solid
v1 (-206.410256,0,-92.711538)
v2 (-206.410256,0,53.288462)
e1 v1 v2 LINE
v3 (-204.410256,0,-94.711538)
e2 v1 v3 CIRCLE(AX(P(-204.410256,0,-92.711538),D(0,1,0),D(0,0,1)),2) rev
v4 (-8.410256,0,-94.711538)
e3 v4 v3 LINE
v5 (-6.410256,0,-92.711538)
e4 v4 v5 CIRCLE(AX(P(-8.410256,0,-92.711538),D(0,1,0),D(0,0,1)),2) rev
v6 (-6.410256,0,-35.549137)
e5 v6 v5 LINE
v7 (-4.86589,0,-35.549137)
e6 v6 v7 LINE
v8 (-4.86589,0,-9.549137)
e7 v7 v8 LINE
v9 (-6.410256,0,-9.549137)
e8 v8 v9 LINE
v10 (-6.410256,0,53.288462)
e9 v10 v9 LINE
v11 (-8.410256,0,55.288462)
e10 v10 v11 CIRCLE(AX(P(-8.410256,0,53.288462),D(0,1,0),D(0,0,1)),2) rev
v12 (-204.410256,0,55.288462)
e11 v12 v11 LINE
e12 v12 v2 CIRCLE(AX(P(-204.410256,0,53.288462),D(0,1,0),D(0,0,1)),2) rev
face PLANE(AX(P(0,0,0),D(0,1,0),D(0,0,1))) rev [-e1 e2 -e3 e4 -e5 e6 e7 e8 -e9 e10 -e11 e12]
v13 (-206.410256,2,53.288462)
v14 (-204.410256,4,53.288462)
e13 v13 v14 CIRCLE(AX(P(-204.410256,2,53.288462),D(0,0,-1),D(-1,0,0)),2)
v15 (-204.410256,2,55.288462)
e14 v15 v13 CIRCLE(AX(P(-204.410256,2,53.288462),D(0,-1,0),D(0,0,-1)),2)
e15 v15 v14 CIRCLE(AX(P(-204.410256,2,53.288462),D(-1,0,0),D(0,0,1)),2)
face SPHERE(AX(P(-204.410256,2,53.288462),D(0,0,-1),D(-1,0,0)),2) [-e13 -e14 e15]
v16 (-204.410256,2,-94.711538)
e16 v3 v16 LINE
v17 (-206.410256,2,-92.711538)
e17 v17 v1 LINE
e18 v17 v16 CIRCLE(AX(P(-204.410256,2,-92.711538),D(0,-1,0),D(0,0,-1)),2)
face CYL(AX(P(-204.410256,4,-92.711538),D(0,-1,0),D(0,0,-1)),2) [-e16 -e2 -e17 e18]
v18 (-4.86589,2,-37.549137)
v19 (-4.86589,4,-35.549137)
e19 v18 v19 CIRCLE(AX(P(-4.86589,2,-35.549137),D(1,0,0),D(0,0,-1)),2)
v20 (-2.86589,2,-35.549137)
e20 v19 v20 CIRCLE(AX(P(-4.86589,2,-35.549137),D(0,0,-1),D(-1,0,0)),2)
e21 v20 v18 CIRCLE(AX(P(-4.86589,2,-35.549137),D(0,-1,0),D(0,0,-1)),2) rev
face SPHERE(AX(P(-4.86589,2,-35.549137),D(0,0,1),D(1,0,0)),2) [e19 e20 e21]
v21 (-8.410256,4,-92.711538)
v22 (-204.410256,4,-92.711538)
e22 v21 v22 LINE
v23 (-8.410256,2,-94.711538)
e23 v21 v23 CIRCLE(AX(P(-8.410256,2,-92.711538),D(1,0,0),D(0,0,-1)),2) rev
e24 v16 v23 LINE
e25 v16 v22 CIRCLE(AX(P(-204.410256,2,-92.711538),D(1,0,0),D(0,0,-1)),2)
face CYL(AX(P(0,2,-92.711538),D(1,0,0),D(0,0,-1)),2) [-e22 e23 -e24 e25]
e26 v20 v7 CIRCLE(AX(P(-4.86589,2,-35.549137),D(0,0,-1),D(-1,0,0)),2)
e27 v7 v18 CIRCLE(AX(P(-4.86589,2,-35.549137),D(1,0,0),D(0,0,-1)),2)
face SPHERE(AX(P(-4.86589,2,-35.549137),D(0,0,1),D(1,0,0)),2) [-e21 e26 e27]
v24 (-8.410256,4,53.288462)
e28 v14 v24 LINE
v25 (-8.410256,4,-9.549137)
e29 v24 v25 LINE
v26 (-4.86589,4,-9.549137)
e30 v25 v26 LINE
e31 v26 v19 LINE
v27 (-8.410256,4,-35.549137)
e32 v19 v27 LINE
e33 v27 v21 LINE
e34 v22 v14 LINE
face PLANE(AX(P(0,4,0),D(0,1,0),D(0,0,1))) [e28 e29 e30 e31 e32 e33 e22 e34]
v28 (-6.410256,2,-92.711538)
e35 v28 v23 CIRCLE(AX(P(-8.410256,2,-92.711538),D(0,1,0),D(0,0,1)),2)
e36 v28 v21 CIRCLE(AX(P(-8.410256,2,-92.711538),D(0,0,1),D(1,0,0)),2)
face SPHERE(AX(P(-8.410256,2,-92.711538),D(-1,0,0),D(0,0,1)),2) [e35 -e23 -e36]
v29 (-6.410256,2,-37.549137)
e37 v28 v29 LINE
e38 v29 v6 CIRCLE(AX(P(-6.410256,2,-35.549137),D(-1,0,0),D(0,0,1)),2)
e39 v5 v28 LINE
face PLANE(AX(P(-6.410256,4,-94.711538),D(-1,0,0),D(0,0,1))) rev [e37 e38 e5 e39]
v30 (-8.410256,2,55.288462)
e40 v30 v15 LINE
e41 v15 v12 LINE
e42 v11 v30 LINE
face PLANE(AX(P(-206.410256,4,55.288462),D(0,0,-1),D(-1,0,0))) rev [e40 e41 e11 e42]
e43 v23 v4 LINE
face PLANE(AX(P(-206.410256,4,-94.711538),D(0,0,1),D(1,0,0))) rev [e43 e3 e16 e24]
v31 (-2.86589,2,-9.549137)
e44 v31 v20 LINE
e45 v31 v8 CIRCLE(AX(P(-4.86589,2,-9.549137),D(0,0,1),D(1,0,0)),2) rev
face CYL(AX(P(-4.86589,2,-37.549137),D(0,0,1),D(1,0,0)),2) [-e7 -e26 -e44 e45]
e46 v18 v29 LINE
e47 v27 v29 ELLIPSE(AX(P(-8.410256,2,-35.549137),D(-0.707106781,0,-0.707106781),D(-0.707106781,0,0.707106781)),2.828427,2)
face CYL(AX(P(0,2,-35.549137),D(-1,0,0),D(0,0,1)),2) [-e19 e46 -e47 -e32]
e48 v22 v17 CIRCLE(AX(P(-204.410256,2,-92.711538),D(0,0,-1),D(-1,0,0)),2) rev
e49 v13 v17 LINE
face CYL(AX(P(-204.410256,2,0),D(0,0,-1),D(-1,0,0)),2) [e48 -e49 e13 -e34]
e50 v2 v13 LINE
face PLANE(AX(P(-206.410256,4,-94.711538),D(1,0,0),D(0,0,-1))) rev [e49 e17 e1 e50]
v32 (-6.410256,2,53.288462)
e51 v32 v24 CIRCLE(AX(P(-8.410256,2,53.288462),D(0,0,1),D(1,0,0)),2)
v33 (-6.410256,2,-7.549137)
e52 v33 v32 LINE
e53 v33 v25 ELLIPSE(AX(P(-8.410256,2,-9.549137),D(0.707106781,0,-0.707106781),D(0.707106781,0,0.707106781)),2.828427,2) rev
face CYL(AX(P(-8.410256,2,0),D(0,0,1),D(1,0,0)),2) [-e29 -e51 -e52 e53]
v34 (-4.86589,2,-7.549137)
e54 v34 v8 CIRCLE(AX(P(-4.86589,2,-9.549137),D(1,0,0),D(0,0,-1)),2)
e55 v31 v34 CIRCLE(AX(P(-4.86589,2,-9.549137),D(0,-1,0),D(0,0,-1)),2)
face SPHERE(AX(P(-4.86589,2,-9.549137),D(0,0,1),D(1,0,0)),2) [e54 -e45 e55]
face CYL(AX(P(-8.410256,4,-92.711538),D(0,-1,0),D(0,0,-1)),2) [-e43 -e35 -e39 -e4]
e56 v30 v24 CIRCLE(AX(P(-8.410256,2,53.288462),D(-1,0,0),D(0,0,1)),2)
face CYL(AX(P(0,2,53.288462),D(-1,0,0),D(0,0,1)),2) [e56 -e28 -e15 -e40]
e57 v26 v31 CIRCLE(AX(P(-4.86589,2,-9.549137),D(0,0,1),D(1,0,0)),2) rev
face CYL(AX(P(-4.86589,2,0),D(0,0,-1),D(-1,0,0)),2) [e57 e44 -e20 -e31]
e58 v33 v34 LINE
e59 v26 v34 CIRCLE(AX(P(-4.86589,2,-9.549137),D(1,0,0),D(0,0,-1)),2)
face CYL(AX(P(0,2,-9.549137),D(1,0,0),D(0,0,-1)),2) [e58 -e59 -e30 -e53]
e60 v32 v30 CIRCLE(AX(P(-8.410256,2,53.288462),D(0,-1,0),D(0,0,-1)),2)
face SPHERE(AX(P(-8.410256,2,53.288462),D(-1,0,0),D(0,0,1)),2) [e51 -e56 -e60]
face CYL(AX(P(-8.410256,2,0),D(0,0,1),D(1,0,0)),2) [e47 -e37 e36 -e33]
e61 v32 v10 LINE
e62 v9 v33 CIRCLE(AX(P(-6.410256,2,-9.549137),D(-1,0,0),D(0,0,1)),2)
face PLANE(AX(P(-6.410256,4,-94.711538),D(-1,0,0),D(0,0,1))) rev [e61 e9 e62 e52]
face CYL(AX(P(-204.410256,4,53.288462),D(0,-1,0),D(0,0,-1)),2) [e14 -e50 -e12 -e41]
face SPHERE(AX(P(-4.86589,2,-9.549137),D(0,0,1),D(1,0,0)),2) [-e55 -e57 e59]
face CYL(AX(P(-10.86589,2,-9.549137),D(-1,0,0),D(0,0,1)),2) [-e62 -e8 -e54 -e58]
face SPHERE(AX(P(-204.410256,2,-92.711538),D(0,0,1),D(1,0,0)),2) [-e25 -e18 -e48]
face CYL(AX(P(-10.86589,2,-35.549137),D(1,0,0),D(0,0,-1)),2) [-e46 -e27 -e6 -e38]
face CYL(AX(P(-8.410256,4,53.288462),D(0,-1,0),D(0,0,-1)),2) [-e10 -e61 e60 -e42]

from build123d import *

# Parameters (mm, degrees)
SKETCH1_W           = 200
SKETCH1_H           = 150
BOSS_EXTRUDE1_DEPTH = 4
FILLET1_R           = 2
FILLET2_R           = 2
FILLET3_R           = 2
FILLET4_R           = 2
SKETCH2_W           = 8
SKETCH2_H           = 30
BOSS_EXTRUDE2_DEPTH = 4
FILLET5_R           = 2


# Some blends are built 0.0001 mm under size
with BuildPart() as part:
    # Sketch1 → Boss-Extrude1 (new body)
    with BuildSketch(Plane(origin=(0, 0, 0), x_dir=(1, 0, 0), z_dir=(0, 1, 0))):
        with Locations((-106.41025641, 19.711538462)):
            Rectangle(SKETCH1_W, SKETCH1_H)
    extrude(amount=BOSS_EXTRUDE1_DEPTH)

    # Fillet1
    fillet1_edges = [part.edges().sort_by_distance(p)[0] for p in [
        (-206.41025641, 4, -19.711538462),
        (-106.41025641, 4, -94.711538462),
    ]]
    fillet(fillet1_edges, radius=FILLET1_R)

    # Fillet2
    fillet2_edges = [part.edges().sort_by_distance(p)[0] for p in [
        (-105.41025641, 4, 55.288461538),
        (-206.41025641, 1, 55.288461538),
        (-205.824469973, 3.414213562, 55.288461538),
    ]]
    fillet(fillet2_edges, radius=FILLET2_R)

    # Fillet3
    fillet3_edges = [part.edges().sort_by_distance(p)[0] for p in [
        (-6.41025641, 1, -94.711538462),
        (-6.41025641, 3.414213562, -94.125752024),
        (-6.41025641, 1, 55.288461538),
        (-6.41025641, 4, -19.711538462),
        (-6.41025641, 3.414213562, 54.702675101),
    ]]
    fillet(fillet3_edges, radius=FILLET3_R)

    # Fillet4
    # the kernel refuses this fillet: 2 mm, written as the material it takes off along each edge
    with BuildSketch(Plane(origin=(-204.41025641, 2, -92.711538462), x_dir=(-1, 0, 0), z_dir=(0, 0, -1))) as fillet4_piece_1_section:
        Polygon((0, 0), (FILLET4_R, 0), (FILLET4_R, FILLET4_R), (0, FILLET4_R), align=None)
    fillet4_piece_1 = extrude(amount=FILLET4_R, mode=Mode.PRIVATE)
    fillet4_piece_1 = fillet4_piece_1 - Plane(origin=(-204.41025641, 2, -92.711538462), x_dir=(0.7071067811865475, -0.7071067811865475, 0), z_dir=(0, 0, -1)) * Sphere(FILLET4_R, mode=Mode.PRIVATE)
    add(fillet4_piece_1, mode=Mode.SUBTRACT)
    with BuildSketch(Plane(origin=(-206.41025641, -5, -94.711538462), x_dir=(1, 0, 0), z_dir=(0, 1, 0))) as fillet4_piece_2:
        with BuildLine():
            CenterArc((FILLET4_R, -FILLET4_R), FILLET4_R, 90, 90)
            Line((0, -FILLET4_R), (0, 0))
            Line((0, 0), (FILLET4_R, 0))
        make_face()
    extrude(amount=7, mode=Mode.SUBTRACT)

    # Sketch2 → Boss-Extrude2 (add)
    with BuildSketch(Plane(origin=(0, 4, 0), x_dir=(1, 0, 0), z_dir=(0, 1, 0))):
        with Locations((-6.865890451, 22.549136896)):
            Rectangle(SKETCH2_W, SKETCH2_H)
    extrude(amount=-BOSS_EXTRUDE2_DEPTH)

    # Fillet5
    fillet5_edges = [part.edges().sort_by_distance(p)[0] for p in [
        (-4.638073431, 0, -37.549136896),
    ]]
    fillet(fillet5_edges, radius=FILLET5_R)
    fillet5_2_edges = [part.edges().sort_by_distance(p)[0] for p in [
        (-2.865890451, 0, -21.549136896),
    ]]
    fillet(fillet5_2_edges, radius=FILLET5_R)
    fillet5_3_edges = [part.edges().sort_by_distance(p)[0] for p in [
        (-5.638073431, 0, -7.549136896),
    ]]
    fillet(fillet5_3_edges, radius=FILLET5_R)
    fillet5_4_edges = [part.edges().sort_by_distance(p)[0] for p in [
        (-6.638073431, 4, -37.549136896),
    ]]
    fillet(fillet5_4_edges, radius=FILLET5_R - 0.0001)  # a hair under: the kernel refuses the full size


solid = part.part
